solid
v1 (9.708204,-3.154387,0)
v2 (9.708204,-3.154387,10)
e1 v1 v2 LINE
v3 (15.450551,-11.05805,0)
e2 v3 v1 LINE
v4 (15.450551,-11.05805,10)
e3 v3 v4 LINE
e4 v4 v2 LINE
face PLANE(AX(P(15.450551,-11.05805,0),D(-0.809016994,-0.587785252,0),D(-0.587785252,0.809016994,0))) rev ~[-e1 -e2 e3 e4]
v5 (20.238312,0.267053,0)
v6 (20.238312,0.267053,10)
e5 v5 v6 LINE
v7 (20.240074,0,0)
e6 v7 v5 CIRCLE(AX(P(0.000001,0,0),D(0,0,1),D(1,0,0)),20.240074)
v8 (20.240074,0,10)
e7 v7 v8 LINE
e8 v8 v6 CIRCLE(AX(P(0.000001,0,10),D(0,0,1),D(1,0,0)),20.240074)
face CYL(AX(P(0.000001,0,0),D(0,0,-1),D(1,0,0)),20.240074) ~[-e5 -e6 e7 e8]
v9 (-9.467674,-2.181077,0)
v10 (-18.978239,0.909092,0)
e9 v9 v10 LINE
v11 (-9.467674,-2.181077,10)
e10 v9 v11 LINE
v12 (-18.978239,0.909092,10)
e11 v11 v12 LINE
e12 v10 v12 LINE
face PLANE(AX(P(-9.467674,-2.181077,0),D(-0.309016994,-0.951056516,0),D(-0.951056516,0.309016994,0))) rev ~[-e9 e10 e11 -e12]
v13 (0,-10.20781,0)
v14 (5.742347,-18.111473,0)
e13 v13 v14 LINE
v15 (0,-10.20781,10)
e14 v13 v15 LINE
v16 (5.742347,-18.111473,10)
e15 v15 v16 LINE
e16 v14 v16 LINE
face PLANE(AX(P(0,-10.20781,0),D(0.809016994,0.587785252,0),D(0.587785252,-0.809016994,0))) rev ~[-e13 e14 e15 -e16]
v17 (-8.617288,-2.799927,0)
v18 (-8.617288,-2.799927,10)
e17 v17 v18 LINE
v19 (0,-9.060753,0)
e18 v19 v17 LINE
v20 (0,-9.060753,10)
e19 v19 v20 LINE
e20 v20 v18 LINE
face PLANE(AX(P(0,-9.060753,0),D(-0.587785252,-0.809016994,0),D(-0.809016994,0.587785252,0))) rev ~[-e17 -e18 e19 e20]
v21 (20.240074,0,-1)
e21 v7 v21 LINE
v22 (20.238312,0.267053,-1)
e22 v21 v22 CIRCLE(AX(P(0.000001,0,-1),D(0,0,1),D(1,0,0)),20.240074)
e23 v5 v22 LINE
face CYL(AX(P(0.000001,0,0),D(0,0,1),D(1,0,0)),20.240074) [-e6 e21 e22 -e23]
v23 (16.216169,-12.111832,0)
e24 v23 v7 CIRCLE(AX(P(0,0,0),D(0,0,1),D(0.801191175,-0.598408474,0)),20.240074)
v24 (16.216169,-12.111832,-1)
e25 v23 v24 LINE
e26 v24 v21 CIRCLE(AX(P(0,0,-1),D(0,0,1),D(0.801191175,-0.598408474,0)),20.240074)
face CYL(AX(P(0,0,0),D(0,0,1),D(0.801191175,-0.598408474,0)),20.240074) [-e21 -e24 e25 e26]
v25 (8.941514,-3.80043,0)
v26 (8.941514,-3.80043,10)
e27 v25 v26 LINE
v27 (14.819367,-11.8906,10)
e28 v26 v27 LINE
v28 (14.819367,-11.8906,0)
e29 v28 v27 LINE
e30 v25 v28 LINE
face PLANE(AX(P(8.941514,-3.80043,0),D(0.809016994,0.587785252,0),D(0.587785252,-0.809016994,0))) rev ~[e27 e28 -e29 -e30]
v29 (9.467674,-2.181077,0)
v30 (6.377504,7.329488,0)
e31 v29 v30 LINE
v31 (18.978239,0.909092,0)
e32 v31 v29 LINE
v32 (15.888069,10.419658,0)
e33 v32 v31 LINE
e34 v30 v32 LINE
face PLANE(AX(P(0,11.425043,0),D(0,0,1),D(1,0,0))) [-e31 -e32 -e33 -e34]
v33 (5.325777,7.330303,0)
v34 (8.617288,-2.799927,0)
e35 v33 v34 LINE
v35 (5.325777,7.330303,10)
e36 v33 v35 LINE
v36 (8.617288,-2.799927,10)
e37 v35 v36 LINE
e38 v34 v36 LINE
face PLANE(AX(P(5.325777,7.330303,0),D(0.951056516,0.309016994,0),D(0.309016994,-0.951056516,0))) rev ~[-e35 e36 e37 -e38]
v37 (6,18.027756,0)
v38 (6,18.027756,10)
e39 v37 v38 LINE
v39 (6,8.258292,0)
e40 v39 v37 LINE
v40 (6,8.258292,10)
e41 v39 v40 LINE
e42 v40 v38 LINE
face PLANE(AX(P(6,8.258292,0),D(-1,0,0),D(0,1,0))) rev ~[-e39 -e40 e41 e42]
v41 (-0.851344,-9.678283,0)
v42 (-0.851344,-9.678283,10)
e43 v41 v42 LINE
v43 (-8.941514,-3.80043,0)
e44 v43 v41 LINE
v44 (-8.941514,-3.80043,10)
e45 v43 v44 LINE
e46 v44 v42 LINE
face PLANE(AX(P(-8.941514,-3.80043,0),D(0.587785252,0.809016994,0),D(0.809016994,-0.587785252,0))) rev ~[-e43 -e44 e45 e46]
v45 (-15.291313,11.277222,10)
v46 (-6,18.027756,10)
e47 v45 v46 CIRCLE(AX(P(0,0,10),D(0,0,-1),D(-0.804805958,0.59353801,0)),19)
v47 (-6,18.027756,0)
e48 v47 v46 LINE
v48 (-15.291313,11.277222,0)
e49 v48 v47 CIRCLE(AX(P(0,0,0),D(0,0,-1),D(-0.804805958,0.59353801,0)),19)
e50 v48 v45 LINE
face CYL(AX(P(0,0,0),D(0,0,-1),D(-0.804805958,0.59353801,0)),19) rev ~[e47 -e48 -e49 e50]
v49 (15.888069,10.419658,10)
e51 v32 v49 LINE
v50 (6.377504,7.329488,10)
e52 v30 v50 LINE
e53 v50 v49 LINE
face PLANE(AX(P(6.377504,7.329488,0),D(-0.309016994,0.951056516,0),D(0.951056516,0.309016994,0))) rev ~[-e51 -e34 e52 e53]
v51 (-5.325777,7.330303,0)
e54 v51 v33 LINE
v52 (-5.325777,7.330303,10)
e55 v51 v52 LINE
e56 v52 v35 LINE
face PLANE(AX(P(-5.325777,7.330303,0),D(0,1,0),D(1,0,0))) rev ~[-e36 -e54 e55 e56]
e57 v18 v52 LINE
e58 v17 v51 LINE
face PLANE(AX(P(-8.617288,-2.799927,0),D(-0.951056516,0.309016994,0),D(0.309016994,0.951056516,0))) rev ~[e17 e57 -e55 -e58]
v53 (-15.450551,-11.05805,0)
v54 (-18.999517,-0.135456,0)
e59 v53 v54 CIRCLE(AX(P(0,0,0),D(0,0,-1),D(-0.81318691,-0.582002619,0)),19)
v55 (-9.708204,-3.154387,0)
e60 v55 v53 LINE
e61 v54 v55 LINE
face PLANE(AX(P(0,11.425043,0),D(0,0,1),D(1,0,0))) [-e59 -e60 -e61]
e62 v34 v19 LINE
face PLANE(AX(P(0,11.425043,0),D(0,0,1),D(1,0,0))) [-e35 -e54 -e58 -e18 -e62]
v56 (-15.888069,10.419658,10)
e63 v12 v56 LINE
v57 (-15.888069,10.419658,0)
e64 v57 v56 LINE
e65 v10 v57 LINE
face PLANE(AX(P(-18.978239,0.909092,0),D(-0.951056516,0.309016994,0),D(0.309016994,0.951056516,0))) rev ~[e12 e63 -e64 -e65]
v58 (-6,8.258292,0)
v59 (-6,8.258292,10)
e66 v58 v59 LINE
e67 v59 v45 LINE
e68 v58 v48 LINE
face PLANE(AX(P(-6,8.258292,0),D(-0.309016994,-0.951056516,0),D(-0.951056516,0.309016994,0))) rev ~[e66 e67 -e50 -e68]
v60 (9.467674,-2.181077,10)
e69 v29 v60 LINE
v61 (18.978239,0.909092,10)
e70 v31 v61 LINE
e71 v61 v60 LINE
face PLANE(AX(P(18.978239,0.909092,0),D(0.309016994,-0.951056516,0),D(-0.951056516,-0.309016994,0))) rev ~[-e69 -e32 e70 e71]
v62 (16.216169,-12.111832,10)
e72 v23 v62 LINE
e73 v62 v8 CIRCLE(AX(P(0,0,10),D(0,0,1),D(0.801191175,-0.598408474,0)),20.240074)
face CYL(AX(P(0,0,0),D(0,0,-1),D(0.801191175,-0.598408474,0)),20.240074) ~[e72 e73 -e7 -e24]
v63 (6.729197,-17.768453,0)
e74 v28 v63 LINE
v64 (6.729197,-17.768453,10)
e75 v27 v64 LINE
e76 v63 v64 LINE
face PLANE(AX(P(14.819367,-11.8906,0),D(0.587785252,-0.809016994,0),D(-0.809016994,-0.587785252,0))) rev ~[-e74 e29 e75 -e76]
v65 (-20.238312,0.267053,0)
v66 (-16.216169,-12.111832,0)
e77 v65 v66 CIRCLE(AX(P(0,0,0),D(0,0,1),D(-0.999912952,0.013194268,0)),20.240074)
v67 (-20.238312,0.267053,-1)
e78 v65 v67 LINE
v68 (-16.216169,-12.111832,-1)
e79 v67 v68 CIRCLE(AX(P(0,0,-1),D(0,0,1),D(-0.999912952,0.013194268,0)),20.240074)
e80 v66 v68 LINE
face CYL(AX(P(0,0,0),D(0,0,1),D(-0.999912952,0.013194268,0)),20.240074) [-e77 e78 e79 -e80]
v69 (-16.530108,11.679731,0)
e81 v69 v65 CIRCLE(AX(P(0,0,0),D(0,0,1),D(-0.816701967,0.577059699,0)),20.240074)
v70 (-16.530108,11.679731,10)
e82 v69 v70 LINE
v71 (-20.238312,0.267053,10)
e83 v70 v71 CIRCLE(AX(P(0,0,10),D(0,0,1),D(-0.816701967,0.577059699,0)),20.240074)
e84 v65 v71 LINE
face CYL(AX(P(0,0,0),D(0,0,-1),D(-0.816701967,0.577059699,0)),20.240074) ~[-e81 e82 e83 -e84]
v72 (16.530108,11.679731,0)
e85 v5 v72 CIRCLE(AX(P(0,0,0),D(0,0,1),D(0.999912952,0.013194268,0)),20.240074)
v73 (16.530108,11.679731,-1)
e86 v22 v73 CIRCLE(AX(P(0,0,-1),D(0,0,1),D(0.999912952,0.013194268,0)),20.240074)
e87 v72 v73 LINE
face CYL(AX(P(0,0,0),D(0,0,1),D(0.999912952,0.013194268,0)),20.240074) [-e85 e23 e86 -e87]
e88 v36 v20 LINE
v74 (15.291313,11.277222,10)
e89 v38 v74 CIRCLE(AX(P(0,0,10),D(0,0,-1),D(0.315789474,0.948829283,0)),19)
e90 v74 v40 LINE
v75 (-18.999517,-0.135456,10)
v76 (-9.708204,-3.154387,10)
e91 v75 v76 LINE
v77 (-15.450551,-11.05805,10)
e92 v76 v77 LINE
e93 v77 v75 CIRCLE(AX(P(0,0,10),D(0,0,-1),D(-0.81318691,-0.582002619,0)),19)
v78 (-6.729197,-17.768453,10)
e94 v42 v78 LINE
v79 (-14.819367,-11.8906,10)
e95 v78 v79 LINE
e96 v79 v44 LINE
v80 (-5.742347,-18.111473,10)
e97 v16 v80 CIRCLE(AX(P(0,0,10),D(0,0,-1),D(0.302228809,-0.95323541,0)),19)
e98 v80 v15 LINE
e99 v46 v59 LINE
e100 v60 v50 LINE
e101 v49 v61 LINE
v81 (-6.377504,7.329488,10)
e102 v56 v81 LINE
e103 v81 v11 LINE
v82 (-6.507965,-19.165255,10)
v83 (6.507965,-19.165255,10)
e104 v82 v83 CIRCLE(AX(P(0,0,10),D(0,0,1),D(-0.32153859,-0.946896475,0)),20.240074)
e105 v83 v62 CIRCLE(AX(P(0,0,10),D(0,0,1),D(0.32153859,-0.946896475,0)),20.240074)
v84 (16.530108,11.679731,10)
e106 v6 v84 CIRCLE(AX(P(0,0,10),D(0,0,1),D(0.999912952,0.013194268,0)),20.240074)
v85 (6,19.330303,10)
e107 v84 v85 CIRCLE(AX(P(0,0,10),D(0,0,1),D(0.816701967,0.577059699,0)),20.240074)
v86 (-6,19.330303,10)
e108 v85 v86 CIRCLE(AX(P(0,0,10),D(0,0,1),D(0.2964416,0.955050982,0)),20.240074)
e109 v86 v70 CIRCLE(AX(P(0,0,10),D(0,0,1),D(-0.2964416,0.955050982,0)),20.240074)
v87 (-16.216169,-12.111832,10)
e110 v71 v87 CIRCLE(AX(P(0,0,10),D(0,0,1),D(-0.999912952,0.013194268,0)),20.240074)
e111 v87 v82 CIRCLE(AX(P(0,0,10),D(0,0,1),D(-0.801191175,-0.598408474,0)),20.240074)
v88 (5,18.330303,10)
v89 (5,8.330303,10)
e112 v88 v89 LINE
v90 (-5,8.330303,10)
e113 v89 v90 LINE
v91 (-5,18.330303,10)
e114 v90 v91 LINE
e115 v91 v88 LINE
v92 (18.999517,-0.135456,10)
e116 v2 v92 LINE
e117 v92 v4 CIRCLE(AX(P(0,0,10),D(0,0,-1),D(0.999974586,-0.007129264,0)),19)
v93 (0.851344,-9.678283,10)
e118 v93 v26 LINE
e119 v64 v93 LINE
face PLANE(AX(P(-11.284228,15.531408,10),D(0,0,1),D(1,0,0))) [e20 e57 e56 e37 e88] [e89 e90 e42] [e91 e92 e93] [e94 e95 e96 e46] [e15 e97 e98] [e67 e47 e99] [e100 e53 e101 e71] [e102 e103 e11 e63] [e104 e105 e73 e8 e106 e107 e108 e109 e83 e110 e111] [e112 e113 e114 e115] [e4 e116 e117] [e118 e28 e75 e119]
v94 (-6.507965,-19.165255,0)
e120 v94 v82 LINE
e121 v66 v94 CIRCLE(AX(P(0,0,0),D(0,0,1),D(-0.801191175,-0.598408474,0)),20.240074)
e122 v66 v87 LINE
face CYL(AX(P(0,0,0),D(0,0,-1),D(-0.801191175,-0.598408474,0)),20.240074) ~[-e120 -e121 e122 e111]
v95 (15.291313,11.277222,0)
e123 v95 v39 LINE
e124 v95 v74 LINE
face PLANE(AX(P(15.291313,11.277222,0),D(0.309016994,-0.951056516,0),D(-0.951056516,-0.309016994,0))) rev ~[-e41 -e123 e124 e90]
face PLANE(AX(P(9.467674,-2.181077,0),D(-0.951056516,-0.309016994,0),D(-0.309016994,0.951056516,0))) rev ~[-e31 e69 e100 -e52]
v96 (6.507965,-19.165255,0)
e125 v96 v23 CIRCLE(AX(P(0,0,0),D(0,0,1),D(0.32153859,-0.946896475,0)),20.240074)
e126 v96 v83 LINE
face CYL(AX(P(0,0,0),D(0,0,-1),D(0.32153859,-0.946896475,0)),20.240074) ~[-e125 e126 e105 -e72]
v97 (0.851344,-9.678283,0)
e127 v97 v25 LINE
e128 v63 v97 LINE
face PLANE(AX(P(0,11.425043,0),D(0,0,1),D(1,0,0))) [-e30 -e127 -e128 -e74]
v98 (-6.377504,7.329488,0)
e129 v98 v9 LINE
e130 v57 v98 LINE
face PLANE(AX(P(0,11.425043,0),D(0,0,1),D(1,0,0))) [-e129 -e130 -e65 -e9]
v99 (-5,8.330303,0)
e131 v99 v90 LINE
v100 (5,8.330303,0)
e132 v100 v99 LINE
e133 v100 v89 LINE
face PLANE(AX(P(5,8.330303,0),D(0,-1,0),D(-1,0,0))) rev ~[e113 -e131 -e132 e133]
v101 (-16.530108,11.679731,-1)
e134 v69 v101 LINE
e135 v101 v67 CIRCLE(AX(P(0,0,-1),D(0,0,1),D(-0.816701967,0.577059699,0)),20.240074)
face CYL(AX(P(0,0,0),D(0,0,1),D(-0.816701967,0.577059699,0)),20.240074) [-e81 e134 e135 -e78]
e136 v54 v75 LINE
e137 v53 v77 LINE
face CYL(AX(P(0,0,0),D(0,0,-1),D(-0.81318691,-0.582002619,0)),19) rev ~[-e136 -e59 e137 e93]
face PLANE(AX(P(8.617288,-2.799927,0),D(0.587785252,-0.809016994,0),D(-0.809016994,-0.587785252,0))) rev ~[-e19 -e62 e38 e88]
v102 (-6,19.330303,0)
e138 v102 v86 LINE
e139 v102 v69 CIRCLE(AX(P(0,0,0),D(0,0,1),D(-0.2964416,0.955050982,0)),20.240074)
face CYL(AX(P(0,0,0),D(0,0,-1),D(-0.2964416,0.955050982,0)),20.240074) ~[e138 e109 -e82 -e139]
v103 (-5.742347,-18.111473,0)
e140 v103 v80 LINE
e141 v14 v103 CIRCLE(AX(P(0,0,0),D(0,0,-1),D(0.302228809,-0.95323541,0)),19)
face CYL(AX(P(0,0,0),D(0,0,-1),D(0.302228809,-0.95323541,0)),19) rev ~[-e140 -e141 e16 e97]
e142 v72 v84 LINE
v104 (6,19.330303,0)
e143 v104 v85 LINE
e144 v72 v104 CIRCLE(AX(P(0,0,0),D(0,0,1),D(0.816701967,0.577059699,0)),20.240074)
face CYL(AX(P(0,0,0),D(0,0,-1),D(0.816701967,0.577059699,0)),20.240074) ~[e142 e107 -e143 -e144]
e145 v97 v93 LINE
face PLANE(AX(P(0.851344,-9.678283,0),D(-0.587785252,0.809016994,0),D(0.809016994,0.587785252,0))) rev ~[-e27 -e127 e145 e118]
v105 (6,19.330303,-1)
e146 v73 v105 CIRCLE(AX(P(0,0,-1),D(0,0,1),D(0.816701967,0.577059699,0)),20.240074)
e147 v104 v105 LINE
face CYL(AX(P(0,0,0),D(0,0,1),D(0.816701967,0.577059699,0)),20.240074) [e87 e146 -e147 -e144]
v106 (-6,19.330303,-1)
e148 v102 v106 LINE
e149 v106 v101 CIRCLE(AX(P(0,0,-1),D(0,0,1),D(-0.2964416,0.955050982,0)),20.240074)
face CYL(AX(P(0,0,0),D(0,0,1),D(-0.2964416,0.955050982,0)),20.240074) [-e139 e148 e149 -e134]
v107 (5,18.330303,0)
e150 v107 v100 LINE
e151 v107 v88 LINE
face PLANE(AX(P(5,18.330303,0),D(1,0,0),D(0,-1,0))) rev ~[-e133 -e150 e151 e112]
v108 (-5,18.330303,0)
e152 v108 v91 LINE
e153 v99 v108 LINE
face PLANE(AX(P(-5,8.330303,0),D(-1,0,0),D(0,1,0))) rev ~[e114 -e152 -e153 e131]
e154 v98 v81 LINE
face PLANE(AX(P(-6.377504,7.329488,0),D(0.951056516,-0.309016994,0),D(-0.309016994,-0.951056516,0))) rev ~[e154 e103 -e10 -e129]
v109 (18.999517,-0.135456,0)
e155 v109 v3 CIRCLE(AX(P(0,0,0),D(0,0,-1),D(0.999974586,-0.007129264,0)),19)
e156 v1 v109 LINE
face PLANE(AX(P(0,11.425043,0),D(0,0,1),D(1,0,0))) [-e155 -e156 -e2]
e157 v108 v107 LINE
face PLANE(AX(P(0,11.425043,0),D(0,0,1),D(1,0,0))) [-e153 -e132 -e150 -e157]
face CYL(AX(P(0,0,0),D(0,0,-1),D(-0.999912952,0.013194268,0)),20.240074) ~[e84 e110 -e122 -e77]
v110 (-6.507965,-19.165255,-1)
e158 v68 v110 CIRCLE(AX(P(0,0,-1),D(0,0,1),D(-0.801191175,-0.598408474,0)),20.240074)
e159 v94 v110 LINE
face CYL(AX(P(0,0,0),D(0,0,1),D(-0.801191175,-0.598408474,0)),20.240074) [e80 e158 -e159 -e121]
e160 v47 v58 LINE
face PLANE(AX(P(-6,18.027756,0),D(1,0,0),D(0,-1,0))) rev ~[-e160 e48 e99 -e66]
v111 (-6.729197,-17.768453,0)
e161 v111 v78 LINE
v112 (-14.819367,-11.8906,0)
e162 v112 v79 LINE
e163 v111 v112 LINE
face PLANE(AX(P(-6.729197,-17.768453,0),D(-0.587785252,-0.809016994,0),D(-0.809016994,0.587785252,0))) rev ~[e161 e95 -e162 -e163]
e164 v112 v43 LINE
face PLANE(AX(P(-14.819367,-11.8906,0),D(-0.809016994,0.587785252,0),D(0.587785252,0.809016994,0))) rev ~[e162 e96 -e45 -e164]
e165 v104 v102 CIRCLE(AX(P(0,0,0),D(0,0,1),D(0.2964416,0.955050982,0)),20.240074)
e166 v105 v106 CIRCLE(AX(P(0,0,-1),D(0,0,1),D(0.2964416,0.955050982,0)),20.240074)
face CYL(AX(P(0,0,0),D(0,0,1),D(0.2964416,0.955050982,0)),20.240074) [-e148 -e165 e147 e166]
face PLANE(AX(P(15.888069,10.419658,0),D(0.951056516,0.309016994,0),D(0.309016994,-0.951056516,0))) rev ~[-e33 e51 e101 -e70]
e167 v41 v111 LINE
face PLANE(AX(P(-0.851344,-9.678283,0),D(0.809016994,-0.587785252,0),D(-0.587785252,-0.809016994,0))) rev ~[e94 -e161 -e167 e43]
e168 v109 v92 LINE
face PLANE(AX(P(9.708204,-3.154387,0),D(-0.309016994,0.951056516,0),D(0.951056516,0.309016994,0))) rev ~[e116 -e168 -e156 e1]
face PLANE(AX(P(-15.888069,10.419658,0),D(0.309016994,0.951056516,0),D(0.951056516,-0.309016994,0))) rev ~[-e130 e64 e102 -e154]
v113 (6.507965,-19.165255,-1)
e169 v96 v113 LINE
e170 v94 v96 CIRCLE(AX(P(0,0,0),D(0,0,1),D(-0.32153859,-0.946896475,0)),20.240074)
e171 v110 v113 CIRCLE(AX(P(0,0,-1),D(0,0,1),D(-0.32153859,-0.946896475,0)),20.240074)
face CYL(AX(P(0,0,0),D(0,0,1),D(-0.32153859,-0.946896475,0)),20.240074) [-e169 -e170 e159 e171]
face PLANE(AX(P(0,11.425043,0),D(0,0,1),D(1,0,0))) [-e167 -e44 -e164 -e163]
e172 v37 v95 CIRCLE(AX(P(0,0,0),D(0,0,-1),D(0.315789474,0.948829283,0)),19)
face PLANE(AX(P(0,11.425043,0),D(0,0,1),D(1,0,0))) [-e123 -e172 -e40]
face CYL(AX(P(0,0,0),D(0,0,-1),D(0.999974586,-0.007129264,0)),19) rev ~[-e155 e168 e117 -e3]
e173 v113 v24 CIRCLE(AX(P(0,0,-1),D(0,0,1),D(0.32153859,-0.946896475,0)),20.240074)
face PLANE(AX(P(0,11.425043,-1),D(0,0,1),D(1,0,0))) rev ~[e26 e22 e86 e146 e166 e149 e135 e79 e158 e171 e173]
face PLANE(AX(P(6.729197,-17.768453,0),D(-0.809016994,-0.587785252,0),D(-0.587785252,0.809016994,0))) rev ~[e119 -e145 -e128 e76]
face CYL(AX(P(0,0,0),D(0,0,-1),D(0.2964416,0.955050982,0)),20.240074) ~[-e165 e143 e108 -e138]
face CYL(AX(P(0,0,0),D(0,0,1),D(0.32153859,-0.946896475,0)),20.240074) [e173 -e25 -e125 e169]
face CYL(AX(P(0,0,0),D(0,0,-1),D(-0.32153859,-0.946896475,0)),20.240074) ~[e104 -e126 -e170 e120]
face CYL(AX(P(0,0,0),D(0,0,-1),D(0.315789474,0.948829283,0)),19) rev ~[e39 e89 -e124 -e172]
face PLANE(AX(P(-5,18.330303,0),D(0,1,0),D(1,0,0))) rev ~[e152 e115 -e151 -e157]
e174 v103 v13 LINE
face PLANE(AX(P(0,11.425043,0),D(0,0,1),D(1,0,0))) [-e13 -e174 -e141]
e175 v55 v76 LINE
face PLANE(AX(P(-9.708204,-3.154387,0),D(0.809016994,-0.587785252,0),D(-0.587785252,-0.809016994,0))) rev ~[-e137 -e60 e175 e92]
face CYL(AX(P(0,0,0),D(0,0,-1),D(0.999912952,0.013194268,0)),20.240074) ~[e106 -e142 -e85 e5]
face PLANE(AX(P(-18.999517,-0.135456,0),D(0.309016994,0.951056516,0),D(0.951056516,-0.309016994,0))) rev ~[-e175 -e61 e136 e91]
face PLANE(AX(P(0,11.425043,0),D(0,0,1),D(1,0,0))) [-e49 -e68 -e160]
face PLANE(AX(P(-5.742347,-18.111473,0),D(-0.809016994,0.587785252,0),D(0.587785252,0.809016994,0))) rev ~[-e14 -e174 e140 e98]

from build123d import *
from build123d import SkipClean  # not in build123d's __all__

# Parameters (mm, degrees)
F0_W     = 10
F0_H     = 10
F1_DEPTH = 1
F2_DEPTH = 10


with BuildPart() as f1:
    # F0 (on Top) → F1 (new body)
    with BuildSketch(Plane.XY):
        with BuildLine():
            Line((6, 8.2582915228), (6, 18.0277563773))
            ThreePointArc((6, 18.0277563773), (5.5020799323, 18.1859043333), (5, 18.3303027798))
            Line((5, 18.3303027798), (5, 8.3303027798))
            Line((5, 8.3303027798), (-5, 8.3303027798))
            Line((-5, 8.3303027798), (-5, 18.3303027798))
            ThreePointArc((-5, 18.3303027798), (-5.5020799323, 18.1859043333), (-6, 18.0277563773))
            Line((-6, 18.0277563773), (-6, 8.2582915228))
            Line((-6, 8.2582915228), (-5.1174302589, 7.9715272307))
            Line((-5.1174302589, 7.9715272307), (-5.3257767127, 7.3303027798))
            Line((-5.3257767127, 7.3303027798), (5.3257767127, 7.3303027798))
            Line((5.3257767127, 7.3303027798), (5.1174302589, 7.9715272307))
            Line((5.1174302589, 7.9715272307), (6, 8.2582915228))
        make_face()
        with BuildLine():
            ThreePointArc((-6.5079649301, -19.165254969), (0, -20.2400742479), (6.5079649301, -19.165254969))
            Line((6.5079649301, -19.165254969), (5.7423473643, -18.1114727935))
            ThreePointArc((5.7423473643, -18.1114727935), (0, -19), (-5.7423473643, -18.1114727935))
            Line((-5.7423473643, -18.1114727935), (-6.5079649301, -19.165254969))
        make_face()
        with BuildLine():
            ThreePointArc((-6.7291966722, -17.7684527224), (-6.2381301971, -17.9467471048), (-5.7423473643, -18.1114727935))
            Line((-5.7423473643, -18.1114727935), (0, -10.2078097002))
            Line((0, -10.2078097002), (-0.5454580974, -9.4570510365))
            Line((-0.5454580974, -9.4570510365), (0, -9.0607525315))
            Line((0, -9.0607525315), (-8.6172877376, -2.7999265141))
            Line((-8.6172877376, -2.7999265141), (-8.8256341914, -3.4411509649))
            Line((-8.8256341914, -3.4411509649), (-9.7082039325, -3.1543866727))
            Line((-9.7082039325, -3.1543866727), (-15.4505512968, -11.0580497659))
            ThreePointArc((-15.4505512968, -11.0580497659), (-15.1406825363, -11.4786642225), (-14.8193666159, -11.8906001995))
            Line((-14.8193666159, -11.8906001995), (-8.941514093, -3.8004302557))
            Line((-8.941514093, -3.8004302557), (-0.8513441492, -9.6782827786))
            Line((-0.8513441492, -9.6782827786), (-6.7291966722, -17.7684527224))
        make_face()
        Polygon((18.9782388763, 0.9090924895), (15.8880689325, 10.4196576525), (6.3775037696, 7.3294877087), (9.4676737133, -2.1810774542), align=None)
        Polygon((0, -9.0607525315), (8.6172877376, -2.7999265141), (5.3257767127, 7.3303027798), (-5.3257767127, 7.3303027798), (-8.6172877376, -2.7999265141), align=None)
        with BuildLine():
            Line((6, 8.2582915228), (15.2913132106, 11.2772221888))
            ThreePointArc((15.2913132106, 11.2772221888), (11.1679197936, 15.3713228931), (6, 18.0277563773))
            Line((6, 18.0277563773), (6, 8.2582915228))
        make_face()
        Polygon((-6.3775037696, 7.3294877087), (-15.8880689325, 10.4196576525), (-18.9782388763, 0.9090924895), (-9.4676737133, -2.1810774542), align=None)
        with BuildLine():
            ThreePointArc((16.2161688626, -12.1118319415), (19.2077727412, -6.3813847935), (20.2400742479, 0))
            ThreePointArc((20.2400742479, 0), (20.2396337779, 0.1335293897), (20.238312387, 0.2670529676))
            Line((20.238312387, 0.2670529676), (18.9995171431, -0.1354560067))
            ThreePointArc((18.9995171431, -0.1354560067), (18.0700738096, -5.8713228931), (15.4505512968, -11.0580497659))
            Line((15.4505512968, -11.0580497659), (16.2161688626, -12.1118319415))
        make_face()
        with BuildLine():
            ThreePointArc((14.8193666159, -11.8906001995), (15.1406825363, -11.4786642225), (15.4505512968, -11.0580497659))
            Line((15.4505512968, -11.0580497659), (9.7082039325, -3.1543866727))
            Line((9.7082039325, -3.1543866727), (8.8256341914, -3.4411509649))
            Line((8.8256341914, -3.4411509649), (8.6172877376, -2.7999265141))
            Line((8.6172877376, -2.7999265141), (0, -9.0607525315))
            Line((0, -9.0607525315), (0.5454580974, -9.4570510365))
            Line((0.5454580974, -9.4570510365), (0, -10.2078097002))
            Line((0, -10.2078097002), (5.7423473643, -18.1114727935))
            ThreePointArc((5.7423473643, -18.1114727935), (6.2381301971, -17.9467471048), (6.7291966722, -17.7684527224))
            Line((6.7291966722, -17.7684527224), (0.8513441492, -9.6782827786))
            Line((0.8513441492, -9.6782827786), (8.941514093, -3.8004302557))
            Line((8.941514093, -3.8004302557), (14.8193666159, -11.8906001995))
        make_face()
        with BuildLine():
            Line((-6, 18.0277563773), (-6, 19.3303027798))
            ThreePointArc((-6, 19.3303027798), (-11.8968171482, 16.3745640339), (-16.5301084545, 11.6797311631))
            Line((-16.5301084545, 11.6797311631), (-15.2913132106, 11.2772221888))
            ThreePointArc((-15.2913132106, 11.2772221888), (-11.1679197936, 15.3713228931), (-6, 18.0277563773))
        make_face()
        with BuildLine():
            ThreePointArc((-18.9995171431, -0.1354560067), (-18.0700738096, -5.8713228931), (-15.4505512968, -11.0580497659))
            Line((-15.4505512968, -11.0580497659), (-9.7082039325, -3.1543866727))
            Line((-9.7082039325, -3.1543866727), (-18.9995171431, -0.1354560067))
        make_face()
        with Locations((0, 13.3303027798)):
            Rectangle(F0_W, F0_H)
        with BuildLine():
            ThreePointArc((6.5079649301, -19.165254969), (11.8968171482, -16.3745640339), (16.2161688626, -12.1118319415))
            Line((16.2161688626, -12.1118319415), (6.5079649301, -19.165254969))
        make_face()
        with BuildLine():
            ThreePointArc((-16.2161688626, -12.1118319415), (-11.8968171482, -16.3745640339), (-6.5079649301, -19.165254969))
            Line((-6.5079649301, -19.165254969), (-16.2161688626, -12.1118319415))
        make_face()
        with BuildLine():
            Line((-20.238312387, 0.2670529676), (-16.5301084545, 11.6797311631))
            ThreePointArc((-16.5301084545, 11.6797311631), (-19.2494545037, 6.25452691), (-20.238312387, 0.2670529676))
        make_face()
        with BuildLine():
            Line((-6, 19.3303027798), (6, 19.3303027798))
            ThreePointArc((6, 19.3303027798), (0, 20.2400742479), (-6, 19.3303027798))
        make_face()
        with BuildLine():
            Line((16.5301084545, 11.6797311631), (20.238312387, 0.2670529676))
            ThreePointArc((20.238312387, 0.2670529676), (19.2494545037, 6.25452691), (16.5301084545, 11.6797311631))
        make_face()
        with BuildLine():
            Line((-15.2913132106, 11.2772221888), (-16.5301084545, 11.6797311631))
            Line((-16.5301084545, 11.6797311631), (-20.238312387, 0.2670529676))
            Line((-20.238312387, 0.2670529676), (-18.9995171431, -0.1354560067))
            ThreePointArc((-18.9995171431, -0.1354560067), (-18.9960590244, 0.3869645243), (-18.9782388763, 0.9090924895))
            ThreePointArc((-18.9782388763, 0.9090924895), (-18.0700738096, 5.8713228931), (-15.8880689325, 10.4196576525))
            ThreePointArc((-15.8880689325, 10.4196576525), (-15.5955866174, 10.8525424698), (-15.2913132106, 11.2772221888))
        make_face()
        Polygon((-14.8193666159, -11.8906001995), (-6.7291966722, -17.7684527224), (-0.8513441492, -9.6782827786), (-8.941514093, -3.8004302557), align=None)
        with BuildLine():
            Line((9.7082039325, -3.1543866727), (18.9995171431, -0.1354560067))
            ThreePointArc((18.9995171431, -0.1354560067), (18.9998792854, -0.0677284337), (19, 0))
            ThreePointArc((19, 0), (18.99455894, 0.4546764512), (18.9782388763, 0.9090924895))
            Line((18.9782388763, 0.9090924895), (9.4676737133, -2.1810774542))
            Line((9.4676737133, -2.1810774542), (6.3775037696, 7.3294877087))
            Line((6.3775037696, 7.3294877087), (15.8880689325, 10.4196576525))
            ThreePointArc((15.8880689325, 10.4196576525), (15.5955866174, 10.8525424698), (15.2913132106, 11.2772221888))
            Line((15.2913132106, 11.2772221888), (6, 8.2582915228))
            Line((6, 8.2582915228), (6, 7.3303027798))
            Line((6, 7.3303027798), (5.3257767127, 7.3303027798))
            Line((5.3257767127, 7.3303027798), (8.6172877376, -2.7999265141))
            Line((8.6172877376, -2.7999265141), (9.1627458351, -2.403628009))
            Line((9.1627458351, -2.403628009), (9.7082039325, -3.1543866727))
        make_face()
        with BuildLine():
            ThreePointArc((15.4505512968, -11.0580497659), (18.0700738096, -5.8713228931), (18.9995171431, -0.1354560067))
            Line((18.9995171431, -0.1354560067), (9.7082039325, -3.1543866727))
            Line((9.7082039325, -3.1543866727), (15.4505512968, -11.0580497659))
        make_face()
        with BuildLine():
            ThreePointArc((-20.238312387, 0.2670529676), (-19.2494545037, -6.25452691), (-16.2161688626, -12.1118319415))
            Line((-16.2161688626, -12.1118319415), (-15.4505512968, -11.0580497659))
            ThreePointArc((-15.4505512968, -11.0580497659), (-18.0700738096, -5.8713228931), (-18.9995171431, -0.1354560067))
            Line((-18.9995171431, -0.1354560067), (-20.238312387, 0.2670529676))
        make_face()
        with BuildLine():
            Line((-6, 8.2582915228), (-15.2913132106, 11.2772221888))
            ThreePointArc((-15.2913132106, 11.2772221888), (-15.5955866174, 10.8525424698), (-15.8880689325, 10.4196576525))
            Line((-15.8880689325, 10.4196576525), (-6.3775037696, 7.3294877087))
            Line((-6.3775037696, 7.3294877087), (-9.4676737133, -2.1810774542))
            Line((-9.4676737133, -2.1810774542), (-18.9782388763, 0.9090924895))
            ThreePointArc((-18.9782388763, 0.9090924895), (-18.9960590244, 0.3869645243), (-18.9995171431, -0.1354560067))
            Line((-18.9995171431, -0.1354560067), (-9.7082039325, -3.1543866727))
            Line((-9.7082039325, -3.1543866727), (-9.1627458351, -2.403628009))
            Line((-9.1627458351, -2.403628009), (-8.6172877376, -2.7999265141))
            Line((-8.6172877376, -2.7999265141), (-5.3257767127, 7.3303027798))
            Line((-5.3257767127, 7.3303027798), (-6, 7.3303027798))
            Line((-6, 7.3303027798), (-6, 8.2582915228))
        make_face()
        with BuildLine():
            Line((15.2913132106, 11.2772221888), (16.5301084545, 11.6797311631))
            ThreePointArc((16.5301084545, 11.6797311631), (11.8968171482, 16.3745640339), (6, 19.3303027798))
            Line((6, 19.3303027798), (6, 18.0277563773))
            ThreePointArc((6, 18.0277563773), (11.1679197936, 15.3713228931), (15.2913132106, 11.2772221888))
        make_face()
        Polygon((6.7291966722, -17.7684527224), (14.8193666159, -11.8906001995), (8.941514093, -3.8004302557), (0.8513441492, -9.6782827786), align=None)
        with BuildLine():
            ThreePointArc((-5.7423473643, -18.1114727935), (0, -19), (5.7423473643, -18.1114727935))
            Line((5.7423473643, -18.1114727935), (0, -10.2078097002))
            Line((0, -10.2078097002), (-5.7423473643, -18.1114727935))
        make_face()
        with BuildLine():
            Line((-6, 8.2582915228), (-6, 18.0277563773))
            ThreePointArc((-6, 18.0277563773), (-11.1679197936, 15.3713228931), (-15.2913132106, 11.2772221888))
            Line((-15.2913132106, 11.2772221888), (-6, 8.2582915228))
        make_face()
        with BuildLine():
            Line((18.9995171431, -0.1354560067), (20.238312387, 0.2670529676))
            Line((20.238312387, 0.2670529676), (16.5301084545, 11.6797311631))
            Line((16.5301084545, 11.6797311631), (15.2913132106, 11.2772221888))
            ThreePointArc((15.2913132106, 11.2772221888), (15.5955866174, 10.8525424698), (15.8880689325, 10.4196576525))
            ThreePointArc((15.8880689325, 10.4196576525), (18.0700738096, 5.8713228931), (18.9782388763, 0.9090924895))
            ThreePointArc((18.9782388763, 0.9090924895), (18.99455894, 0.4546764512), (19, 0))
            ThreePointArc((19, 0), (18.9998792854, -0.0677284337), (18.9995171431, -0.1354560067))
        make_face()
        with BuildLine():
            Line((6, 18.0277563773), (6, 19.3303027798))
            Line((6, 19.3303027798), (-6, 19.3303027798))
            Line((-6, 19.3303027798), (-6, 18.0277563773))
            ThreePointArc((-6, 18.0277563773), (-5.5020799323, 18.1859043333), (-5, 18.3303027798))
            ThreePointArc((-5, 18.3303027798), (0, 19), (5, 18.3303027798))
            ThreePointArc((5, 18.3303027798), (5.5020799323, 18.1859043333), (6, 18.0277563773))
        make_face()
        with BuildLine():
            Line((6.5079649301, -19.165254969), (16.2161688626, -12.1118319415))
            Line((16.2161688626, -12.1118319415), (15.4505512968, -11.0580497659))
            ThreePointArc((15.4505512968, -11.0580497659), (15.1406825363, -11.4786642225), (14.8193666159, -11.8906001995))
            ThreePointArc((14.8193666159, -11.8906001995), (11.1679197936, -15.3713228931), (6.7291966722, -17.7684527224))
            ThreePointArc((6.7291966722, -17.7684527224), (6.2381301971, -17.9467471048), (5.7423473643, -18.1114727935))
            Line((5.7423473643, -18.1114727935), (6.5079649301, -19.165254969))
        make_face()
        with BuildLine():
            Line((-16.2161688626, -12.1118319415), (-6.5079649301, -19.165254969))
            Line((-6.5079649301, -19.165254969), (-5.7423473643, -18.1114727935))
            ThreePointArc((-5.7423473643, -18.1114727935), (-6.2381301971, -17.9467471048), (-6.7291966722, -17.7684527224))
            ThreePointArc((-6.7291966722, -17.7684527224), (-11.1679197936, -15.3713228931), (-14.8193666159, -11.8906001995))
            ThreePointArc((-14.8193666159, -11.8906001995), (-15.1406825363, -11.4786642225), (-15.4505512968, -11.0580497659))
            Line((-15.4505512968, -11.0580497659), (-16.2161688626, -12.1118319415))
        make_face()
        with BuildLine():
            ThreePointArc((6.7291966722, -17.7684527224), (11.1679197936, -15.3713228931), (14.8193666159, -11.8906001995))
            Line((14.8193666159, -11.8906001995), (6.7291966722, -17.7684527224))
        make_face()
        with BuildLine():
            ThreePointArc((-14.8193666159, -11.8906001995), (-11.1679197936, -15.3713228931), (-6.7291966722, -17.7684527224))
            Line((-6.7291966722, -17.7684527224), (-14.8193666159, -11.8906001995))
        make_face()
        with BuildLine():
            Line((-18.9782388763, 0.9090924895), (-15.8880689325, 10.4196576525))
            ThreePointArc((-15.8880689325, 10.4196576525), (-18.0700738096, 5.8713228931), (-18.9782388763, 0.9090924895))
        make_face()
        with BuildLine():
            Line((-5, 18.3303027798), (5, 18.3303027798))
            ThreePointArc((5, 18.3303027798), (0, 19), (-5, 18.3303027798))
        make_face()
        with BuildLine():
            ThreePointArc((18.9782388763, 0.9090924895), (18.0700738096, 5.8713228931), (15.8880689325, 10.4196576525))
            Line((15.8880689325, 10.4196576525), (18.9782388763, 0.9090924895))
        make_face()
        Polygon((8.8256341914, -3.4411509649), (9.7082039325, -3.1543866727), (9.1627458351, -2.403628009), (8.6172877376, -2.7999265141), align=None)
        Polygon((6, 7.3303027798), (6, 8.2582915228), (5.1174302589, 7.9715272307), (5.3257767127, 7.3303027798), align=None)
        Polygon((-5.1174302589, 7.9715272307), (-6, 8.2582915228), (-6, 7.3303027798), (-5.3257767127, 7.3303027798), align=None)
        Polygon((-9.1627458351, -2.403628009), (-9.7082039325, -3.1543866727), (-8.8256341914, -3.4411509649), (-8.6172877376, -2.7999265141), align=None)
        Polygon((-0.5454580974, -9.4570510365), (0, -10.2078097002), (0.5454580974, -9.4570510365), (0, -9.0607525315), align=None)
    extrude(amount=-F1_DEPTH)

    # F0 (on Top) → F2 (join)
    with BuildSketch(Plane.XY):
        with BuildLine():
            Line((-6, 18.0277563773), (-6, 19.3303027798))
            ThreePointArc((-6, 19.3303027798), (-11.8968171482, 16.3745640339), (-16.5301084545, 11.6797311631))
            Line((-16.5301084545, 11.6797311631), (-15.2913132106, 11.2772221888))
            ThreePointArc((-15.2913132106, 11.2772221888), (-11.1679197936, 15.3713228931), (-6, 18.0277563773))
        make_face()
        with BuildLine():
            Line((6, 8.2582915228), (6, 18.0277563773))
            ThreePointArc((6, 18.0277563773), (5.5020799323, 18.1859043333), (5, 18.3303027798))
            Line((5, 18.3303027798), (5, 8.3303027798))
            Line((5, 8.3303027798), (-5, 8.3303027798))
            Line((-5, 8.3303027798), (-5, 18.3303027798))
            ThreePointArc((-5, 18.3303027798), (-5.5020799323, 18.1859043333), (-6, 18.0277563773))
            Line((-6, 18.0277563773), (-6, 8.2582915228))
            Line((-6, 8.2582915228), (-5.1174302589, 7.9715272307))
            Line((-5.1174302589, 7.9715272307), (-5.3257767127, 7.3303027798))
            Line((-5.3257767127, 7.3303027798), (5.3257767127, 7.3303027798))
            Line((5.3257767127, 7.3303027798), (5.1174302589, 7.9715272307))
            Line((5.1174302589, 7.9715272307), (6, 8.2582915228))
        make_face()
        with BuildLine():
            Line((-18.9782388763, 0.9090924895), (-15.8880689325, 10.4196576525))
            ThreePointArc((-15.8880689325, 10.4196576525), (-18.0700738096, 5.8713228931), (-18.9782388763, 0.9090924895))
        make_face()
        with BuildLine():
            Line((-5, 18.3303027798), (5, 18.3303027798))
            ThreePointArc((5, 18.3303027798), (0, 19), (-5, 18.3303027798))
        make_face()
        with BuildLine():
            ThreePointArc((18.9782388763, 0.9090924895), (18.0700738096, 5.8713228931), (15.8880689325, 10.4196576525))
            Line((15.8880689325, 10.4196576525), (18.9782388763, 0.9090924895))
        make_face()
        with BuildLine():
            Line((-20.238312387, 0.2670529676), (-16.5301084545, 11.6797311631))
            ThreePointArc((-16.5301084545, 11.6797311631), (-19.2494545037, 6.25452691), (-20.238312387, 0.2670529676))
        make_face()
        with BuildLine():
            Line((-6, 19.3303027798), (6, 19.3303027798))
            ThreePointArc((6, 19.3303027798), (0, 20.2400742479), (-6, 19.3303027798))
        make_face()
        with BuildLine():
            Line((16.5301084545, 11.6797311631), (20.238312387, 0.2670529676))
            ThreePointArc((20.238312387, 0.2670529676), (19.2494545037, 6.25452691), (16.5301084545, 11.6797311631))
        make_face()
        with BuildLine():
            Line((-15.2913132106, 11.2772221888), (-16.5301084545, 11.6797311631))
            Line((-16.5301084545, 11.6797311631), (-20.238312387, 0.2670529676))
            Line((-20.238312387, 0.2670529676), (-18.9995171431, -0.1354560067))
            ThreePointArc((-18.9995171431, -0.1354560067), (-18.9960590244, 0.3869645243), (-18.9782388763, 0.9090924895))
            ThreePointArc((-18.9782388763, 0.9090924895), (-18.0700738096, 5.8713228931), (-15.8880689325, 10.4196576525))
            ThreePointArc((-15.8880689325, 10.4196576525), (-15.5955866174, 10.8525424698), (-15.2913132106, 11.2772221888))
        make_face()
        with BuildLine():
            Line((9.7082039325, -3.1543866727), (18.9995171431, -0.1354560067))
            ThreePointArc((18.9995171431, -0.1354560067), (18.9998792854, -0.0677284337), (19, 0))
            ThreePointArc((19, 0), (18.99455894, 0.4546764512), (18.9782388763, 0.9090924895))
            Line((18.9782388763, 0.9090924895), (9.4676737133, -2.1810774542))
            Line((9.4676737133, -2.1810774542), (6.3775037696, 7.3294877087))
            Line((6.3775037696, 7.3294877087), (15.8880689325, 10.4196576525))
            ThreePointArc((15.8880689325, 10.4196576525), (15.5955866174, 10.8525424698), (15.2913132106, 11.2772221888))
            Line((15.2913132106, 11.2772221888), (6, 8.2582915228))
            Line((6, 8.2582915228), (6, 7.3303027798))
            Line((6, 7.3303027798), (5.3257767127, 7.3303027798))
            Line((5.3257767127, 7.3303027798), (8.6172877376, -2.7999265141))
            Line((8.6172877376, -2.7999265141), (9.1627458351, -2.403628009))
            Line((9.1627458351, -2.403628009), (9.7082039325, -3.1543866727))
        make_face()
        with BuildLine():
            Line((15.2913132106, 11.2772221888), (16.5301084545, 11.6797311631))
            ThreePointArc((16.5301084545, 11.6797311631), (11.8968171482, 16.3745640339), (6, 19.3303027798))
            Line((6, 19.3303027798), (6, 18.0277563773))
            ThreePointArc((6, 18.0277563773), (11.1679197936, 15.3713228931), (15.2913132106, 11.2772221888))
        make_face()
        with BuildLine():
            ThreePointArc((-20.238312387, 0.2670529676), (-19.2494545037, -6.25452691), (-16.2161688626, -12.1118319415))
            Line((-16.2161688626, -12.1118319415), (-15.4505512968, -11.0580497659))
            ThreePointArc((-15.4505512968, -11.0580497659), (-18.0700738096, -5.8713228931), (-18.9995171431, -0.1354560067))
            Line((-18.9995171431, -0.1354560067), (-20.238312387, 0.2670529676))
        make_face()
        with BuildLine():
            ThreePointArc((16.2161688626, -12.1118319415), (19.2077727412, -6.3813847935), (20.2400742479, 0))
            ThreePointArc((20.2400742479, 0), (20.2396337779, 0.1335293897), (20.238312387, 0.2670529676))
            Line((20.238312387, 0.2670529676), (18.9995171431, -0.1354560067))
            ThreePointArc((18.9995171431, -0.1354560067), (18.0700738096, -5.8713228931), (15.4505512968, -11.0580497659))
            Line((15.4505512968, -11.0580497659), (16.2161688626, -12.1118319415))
        make_face()
        with BuildLine():
            Line((-6, 8.2582915228), (-15.2913132106, 11.2772221888))
            ThreePointArc((-15.2913132106, 11.2772221888), (-15.5955866174, 10.8525424698), (-15.8880689325, 10.4196576525))
            Line((-15.8880689325, 10.4196576525), (-6.3775037696, 7.3294877087))
            Line((-6.3775037696, 7.3294877087), (-9.4676737133, -2.1810774542))
            Line((-9.4676737133, -2.1810774542), (-18.9782388763, 0.9090924895))
            ThreePointArc((-18.9782388763, 0.9090924895), (-18.9960590244, 0.3869645243), (-18.9995171431, -0.1354560067))
            Line((-18.9995171431, -0.1354560067), (-9.7082039325, -3.1543866727))
            Line((-9.7082039325, -3.1543866727), (-9.1627458351, -2.403628009))
            Line((-9.1627458351, -2.403628009), (-8.6172877376, -2.7999265141))
            Line((-8.6172877376, -2.7999265141), (-5.3257767127, 7.3303027798))
            Line((-5.3257767127, 7.3303027798), (-6, 7.3303027798))
            Line((-6, 7.3303027798), (-6, 8.2582915228))
        make_face()
        with BuildLine():
            Line((6, 18.0277563773), (6, 19.3303027798))
            Line((6, 19.3303027798), (-6, 19.3303027798))
            Line((-6, 19.3303027798), (-6, 18.0277563773))
            ThreePointArc((-6, 18.0277563773), (-5.5020799323, 18.1859043333), (-5, 18.3303027798))
            ThreePointArc((-5, 18.3303027798), (0, 19), (5, 18.3303027798))
            ThreePointArc((5, 18.3303027798), (5.5020799323, 18.1859043333), (6, 18.0277563773))
        make_face()
        with BuildLine():
            Line((18.9995171431, -0.1354560067), (20.238312387, 0.2670529676))
            Line((20.238312387, 0.2670529676), (16.5301084545, 11.6797311631))
            Line((16.5301084545, 11.6797311631), (15.2913132106, 11.2772221888))
            ThreePointArc((15.2913132106, 11.2772221888), (15.5955866174, 10.8525424698), (15.8880689325, 10.4196576525))
            ThreePointArc((15.8880689325, 10.4196576525), (18.0700738096, 5.8713228931), (18.9782388763, 0.9090924895))
            ThreePointArc((18.9782388763, 0.9090924895), (18.99455894, 0.4546764512), (19, 0))
            ThreePointArc((19, 0), (18.9998792854, -0.0677284337), (18.9995171431, -0.1354560067))
        make_face()
        Polygon((8.8256341914, -3.4411509649), (9.7082039325, -3.1543866727), (9.1627458351, -2.403628009), (8.6172877376, -2.7999265141), align=None)
        Polygon((6, 7.3303027798), (6, 8.2582915228), (5.1174302589, 7.9715272307), (5.3257767127, 7.3303027798), align=None)
        Polygon((-5.1174302589, 7.9715272307), (-6, 8.2582915228), (-6, 7.3303027798), (-5.3257767127, 7.3303027798), align=None)
        Polygon((-9.1627458351, -2.403628009), (-9.7082039325, -3.1543866727), (-8.8256341914, -3.4411509649), (-8.6172877376, -2.7999265141), align=None)
        Polygon((-0.5454580974, -9.4570510365), (0, -10.2078097002), (0.5454580974, -9.4570510365), (0, -9.0607525315), align=None)
        with BuildLine():
            Line((-16.2161688626, -12.1118319415), (-6.5079649301, -19.165254969))
            Line((-6.5079649301, -19.165254969), (-5.7423473643, -18.1114727935))
            ThreePointArc((-5.7423473643, -18.1114727935), (-6.2381301971, -17.9467471048), (-6.7291966722, -17.7684527224))
            ThreePointArc((-6.7291966722, -17.7684527224), (-11.1679197936, -15.3713228931), (-14.8193666159, -11.8906001995))
            ThreePointArc((-14.8193666159, -11.8906001995), (-15.1406825363, -11.4786642225), (-15.4505512968, -11.0580497659))
            Line((-15.4505512968, -11.0580497659), (-16.2161688626, -12.1118319415))
        make_face()
        with BuildLine():
            ThreePointArc((-6.7291966722, -17.7684527224), (-6.2381301971, -17.9467471048), (-5.7423473643, -18.1114727935))
            Line((-5.7423473643, -18.1114727935), (0, -10.2078097002))
            Line((0, -10.2078097002), (-0.5454580974, -9.4570510365))
            Line((-0.5454580974, -9.4570510365), (0, -9.0607525315))
            Line((0, -9.0607525315), (-8.6172877376, -2.7999265141))
            Line((-8.6172877376, -2.7999265141), (-8.8256341914, -3.4411509649))
            Line((-8.8256341914, -3.4411509649), (-9.7082039325, -3.1543866727))
            Line((-9.7082039325, -3.1543866727), (-15.4505512968, -11.0580497659))
            ThreePointArc((-15.4505512968, -11.0580497659), (-15.1406825363, -11.4786642225), (-14.8193666159, -11.8906001995))
            Line((-14.8193666159, -11.8906001995), (-8.941514093, -3.8004302557))
            Line((-8.941514093, -3.8004302557), (-0.8513441492, -9.6782827786))
            Line((-0.8513441492, -9.6782827786), (-6.7291966722, -17.7684527224))
        make_face()
        with BuildLine():
            ThreePointArc((-6.5079649301, -19.165254969), (0, -20.2400742479), (6.5079649301, -19.165254969))
            Line((6.5079649301, -19.165254969), (5.7423473643, -18.1114727935))
            ThreePointArc((5.7423473643, -18.1114727935), (0, -19), (-5.7423473643, -18.1114727935))
            Line((-5.7423473643, -18.1114727935), (-6.5079649301, -19.165254969))
        make_face()
        with BuildLine():
            ThreePointArc((6.5079649301, -19.165254969), (11.8968171482, -16.3745640339), (16.2161688626, -12.1118319415))
            Line((16.2161688626, -12.1118319415), (6.5079649301, -19.165254969))
        make_face()
        with BuildLine():
            ThreePointArc((-16.2161688626, -12.1118319415), (-11.8968171482, -16.3745640339), (-6.5079649301, -19.165254969))
            Line((-6.5079649301, -19.165254969), (-16.2161688626, -12.1118319415))
        make_face()
        with BuildLine():
            ThreePointArc((14.8193666159, -11.8906001995), (15.1406825363, -11.4786642225), (15.4505512968, -11.0580497659))
            Line((15.4505512968, -11.0580497659), (9.7082039325, -3.1543866727))
            Line((9.7082039325, -3.1543866727), (8.8256341914, -3.4411509649))
            Line((8.8256341914, -3.4411509649), (8.6172877376, -2.7999265141))
            Line((8.6172877376, -2.7999265141), (0, -9.0607525315))
            Line((0, -9.0607525315), (0.5454580974, -9.4570510365))
            Line((0.5454580974, -9.4570510365), (0, -10.2078097002))
            Line((0, -10.2078097002), (5.7423473643, -18.1114727935))
            ThreePointArc((5.7423473643, -18.1114727935), (6.2381301971, -17.9467471048), (6.7291966722, -17.7684527224))
            Line((6.7291966722, -17.7684527224), (0.8513441492, -9.6782827786))
            Line((0.8513441492, -9.6782827786), (8.941514093, -3.8004302557))
            Line((8.941514093, -3.8004302557), (14.8193666159, -11.8906001995))
        make_face()
        with BuildLine():
            ThreePointArc((6.7291966722, -17.7684527224), (11.1679197936, -15.3713228931), (14.8193666159, -11.8906001995))
            Line((14.8193666159, -11.8906001995), (6.7291966722, -17.7684527224))
        make_face()
        with BuildLine():
            ThreePointArc((-14.8193666159, -11.8906001995), (-11.1679197936, -15.3713228931), (-6.7291966722, -17.7684527224))
            Line((-6.7291966722, -17.7684527224), (-14.8193666159, -11.8906001995))
        make_face()
        with BuildLine():
            Line((6.5079649301, -19.165254969), (16.2161688626, -12.1118319415))
            Line((16.2161688626, -12.1118319415), (15.4505512968, -11.0580497659))
            ThreePointArc((15.4505512968, -11.0580497659), (15.1406825363, -11.4786642225), (14.8193666159, -11.8906001995))
            ThreePointArc((14.8193666159, -11.8906001995), (11.1679197936, -15.3713228931), (6.7291966722, -17.7684527224))
            ThreePointArc((6.7291966722, -17.7684527224), (6.2381301971, -17.9467471048), (5.7423473643, -18.1114727935))
            Line((5.7423473643, -18.1114727935), (6.5079649301, -19.165254969))
        make_face()
    with SkipClean():  # cleaning this boolean's faces spoils the solid; the shape is the same uncleaned
        extrude(amount=F2_DEPTH)


solid = f1.part
